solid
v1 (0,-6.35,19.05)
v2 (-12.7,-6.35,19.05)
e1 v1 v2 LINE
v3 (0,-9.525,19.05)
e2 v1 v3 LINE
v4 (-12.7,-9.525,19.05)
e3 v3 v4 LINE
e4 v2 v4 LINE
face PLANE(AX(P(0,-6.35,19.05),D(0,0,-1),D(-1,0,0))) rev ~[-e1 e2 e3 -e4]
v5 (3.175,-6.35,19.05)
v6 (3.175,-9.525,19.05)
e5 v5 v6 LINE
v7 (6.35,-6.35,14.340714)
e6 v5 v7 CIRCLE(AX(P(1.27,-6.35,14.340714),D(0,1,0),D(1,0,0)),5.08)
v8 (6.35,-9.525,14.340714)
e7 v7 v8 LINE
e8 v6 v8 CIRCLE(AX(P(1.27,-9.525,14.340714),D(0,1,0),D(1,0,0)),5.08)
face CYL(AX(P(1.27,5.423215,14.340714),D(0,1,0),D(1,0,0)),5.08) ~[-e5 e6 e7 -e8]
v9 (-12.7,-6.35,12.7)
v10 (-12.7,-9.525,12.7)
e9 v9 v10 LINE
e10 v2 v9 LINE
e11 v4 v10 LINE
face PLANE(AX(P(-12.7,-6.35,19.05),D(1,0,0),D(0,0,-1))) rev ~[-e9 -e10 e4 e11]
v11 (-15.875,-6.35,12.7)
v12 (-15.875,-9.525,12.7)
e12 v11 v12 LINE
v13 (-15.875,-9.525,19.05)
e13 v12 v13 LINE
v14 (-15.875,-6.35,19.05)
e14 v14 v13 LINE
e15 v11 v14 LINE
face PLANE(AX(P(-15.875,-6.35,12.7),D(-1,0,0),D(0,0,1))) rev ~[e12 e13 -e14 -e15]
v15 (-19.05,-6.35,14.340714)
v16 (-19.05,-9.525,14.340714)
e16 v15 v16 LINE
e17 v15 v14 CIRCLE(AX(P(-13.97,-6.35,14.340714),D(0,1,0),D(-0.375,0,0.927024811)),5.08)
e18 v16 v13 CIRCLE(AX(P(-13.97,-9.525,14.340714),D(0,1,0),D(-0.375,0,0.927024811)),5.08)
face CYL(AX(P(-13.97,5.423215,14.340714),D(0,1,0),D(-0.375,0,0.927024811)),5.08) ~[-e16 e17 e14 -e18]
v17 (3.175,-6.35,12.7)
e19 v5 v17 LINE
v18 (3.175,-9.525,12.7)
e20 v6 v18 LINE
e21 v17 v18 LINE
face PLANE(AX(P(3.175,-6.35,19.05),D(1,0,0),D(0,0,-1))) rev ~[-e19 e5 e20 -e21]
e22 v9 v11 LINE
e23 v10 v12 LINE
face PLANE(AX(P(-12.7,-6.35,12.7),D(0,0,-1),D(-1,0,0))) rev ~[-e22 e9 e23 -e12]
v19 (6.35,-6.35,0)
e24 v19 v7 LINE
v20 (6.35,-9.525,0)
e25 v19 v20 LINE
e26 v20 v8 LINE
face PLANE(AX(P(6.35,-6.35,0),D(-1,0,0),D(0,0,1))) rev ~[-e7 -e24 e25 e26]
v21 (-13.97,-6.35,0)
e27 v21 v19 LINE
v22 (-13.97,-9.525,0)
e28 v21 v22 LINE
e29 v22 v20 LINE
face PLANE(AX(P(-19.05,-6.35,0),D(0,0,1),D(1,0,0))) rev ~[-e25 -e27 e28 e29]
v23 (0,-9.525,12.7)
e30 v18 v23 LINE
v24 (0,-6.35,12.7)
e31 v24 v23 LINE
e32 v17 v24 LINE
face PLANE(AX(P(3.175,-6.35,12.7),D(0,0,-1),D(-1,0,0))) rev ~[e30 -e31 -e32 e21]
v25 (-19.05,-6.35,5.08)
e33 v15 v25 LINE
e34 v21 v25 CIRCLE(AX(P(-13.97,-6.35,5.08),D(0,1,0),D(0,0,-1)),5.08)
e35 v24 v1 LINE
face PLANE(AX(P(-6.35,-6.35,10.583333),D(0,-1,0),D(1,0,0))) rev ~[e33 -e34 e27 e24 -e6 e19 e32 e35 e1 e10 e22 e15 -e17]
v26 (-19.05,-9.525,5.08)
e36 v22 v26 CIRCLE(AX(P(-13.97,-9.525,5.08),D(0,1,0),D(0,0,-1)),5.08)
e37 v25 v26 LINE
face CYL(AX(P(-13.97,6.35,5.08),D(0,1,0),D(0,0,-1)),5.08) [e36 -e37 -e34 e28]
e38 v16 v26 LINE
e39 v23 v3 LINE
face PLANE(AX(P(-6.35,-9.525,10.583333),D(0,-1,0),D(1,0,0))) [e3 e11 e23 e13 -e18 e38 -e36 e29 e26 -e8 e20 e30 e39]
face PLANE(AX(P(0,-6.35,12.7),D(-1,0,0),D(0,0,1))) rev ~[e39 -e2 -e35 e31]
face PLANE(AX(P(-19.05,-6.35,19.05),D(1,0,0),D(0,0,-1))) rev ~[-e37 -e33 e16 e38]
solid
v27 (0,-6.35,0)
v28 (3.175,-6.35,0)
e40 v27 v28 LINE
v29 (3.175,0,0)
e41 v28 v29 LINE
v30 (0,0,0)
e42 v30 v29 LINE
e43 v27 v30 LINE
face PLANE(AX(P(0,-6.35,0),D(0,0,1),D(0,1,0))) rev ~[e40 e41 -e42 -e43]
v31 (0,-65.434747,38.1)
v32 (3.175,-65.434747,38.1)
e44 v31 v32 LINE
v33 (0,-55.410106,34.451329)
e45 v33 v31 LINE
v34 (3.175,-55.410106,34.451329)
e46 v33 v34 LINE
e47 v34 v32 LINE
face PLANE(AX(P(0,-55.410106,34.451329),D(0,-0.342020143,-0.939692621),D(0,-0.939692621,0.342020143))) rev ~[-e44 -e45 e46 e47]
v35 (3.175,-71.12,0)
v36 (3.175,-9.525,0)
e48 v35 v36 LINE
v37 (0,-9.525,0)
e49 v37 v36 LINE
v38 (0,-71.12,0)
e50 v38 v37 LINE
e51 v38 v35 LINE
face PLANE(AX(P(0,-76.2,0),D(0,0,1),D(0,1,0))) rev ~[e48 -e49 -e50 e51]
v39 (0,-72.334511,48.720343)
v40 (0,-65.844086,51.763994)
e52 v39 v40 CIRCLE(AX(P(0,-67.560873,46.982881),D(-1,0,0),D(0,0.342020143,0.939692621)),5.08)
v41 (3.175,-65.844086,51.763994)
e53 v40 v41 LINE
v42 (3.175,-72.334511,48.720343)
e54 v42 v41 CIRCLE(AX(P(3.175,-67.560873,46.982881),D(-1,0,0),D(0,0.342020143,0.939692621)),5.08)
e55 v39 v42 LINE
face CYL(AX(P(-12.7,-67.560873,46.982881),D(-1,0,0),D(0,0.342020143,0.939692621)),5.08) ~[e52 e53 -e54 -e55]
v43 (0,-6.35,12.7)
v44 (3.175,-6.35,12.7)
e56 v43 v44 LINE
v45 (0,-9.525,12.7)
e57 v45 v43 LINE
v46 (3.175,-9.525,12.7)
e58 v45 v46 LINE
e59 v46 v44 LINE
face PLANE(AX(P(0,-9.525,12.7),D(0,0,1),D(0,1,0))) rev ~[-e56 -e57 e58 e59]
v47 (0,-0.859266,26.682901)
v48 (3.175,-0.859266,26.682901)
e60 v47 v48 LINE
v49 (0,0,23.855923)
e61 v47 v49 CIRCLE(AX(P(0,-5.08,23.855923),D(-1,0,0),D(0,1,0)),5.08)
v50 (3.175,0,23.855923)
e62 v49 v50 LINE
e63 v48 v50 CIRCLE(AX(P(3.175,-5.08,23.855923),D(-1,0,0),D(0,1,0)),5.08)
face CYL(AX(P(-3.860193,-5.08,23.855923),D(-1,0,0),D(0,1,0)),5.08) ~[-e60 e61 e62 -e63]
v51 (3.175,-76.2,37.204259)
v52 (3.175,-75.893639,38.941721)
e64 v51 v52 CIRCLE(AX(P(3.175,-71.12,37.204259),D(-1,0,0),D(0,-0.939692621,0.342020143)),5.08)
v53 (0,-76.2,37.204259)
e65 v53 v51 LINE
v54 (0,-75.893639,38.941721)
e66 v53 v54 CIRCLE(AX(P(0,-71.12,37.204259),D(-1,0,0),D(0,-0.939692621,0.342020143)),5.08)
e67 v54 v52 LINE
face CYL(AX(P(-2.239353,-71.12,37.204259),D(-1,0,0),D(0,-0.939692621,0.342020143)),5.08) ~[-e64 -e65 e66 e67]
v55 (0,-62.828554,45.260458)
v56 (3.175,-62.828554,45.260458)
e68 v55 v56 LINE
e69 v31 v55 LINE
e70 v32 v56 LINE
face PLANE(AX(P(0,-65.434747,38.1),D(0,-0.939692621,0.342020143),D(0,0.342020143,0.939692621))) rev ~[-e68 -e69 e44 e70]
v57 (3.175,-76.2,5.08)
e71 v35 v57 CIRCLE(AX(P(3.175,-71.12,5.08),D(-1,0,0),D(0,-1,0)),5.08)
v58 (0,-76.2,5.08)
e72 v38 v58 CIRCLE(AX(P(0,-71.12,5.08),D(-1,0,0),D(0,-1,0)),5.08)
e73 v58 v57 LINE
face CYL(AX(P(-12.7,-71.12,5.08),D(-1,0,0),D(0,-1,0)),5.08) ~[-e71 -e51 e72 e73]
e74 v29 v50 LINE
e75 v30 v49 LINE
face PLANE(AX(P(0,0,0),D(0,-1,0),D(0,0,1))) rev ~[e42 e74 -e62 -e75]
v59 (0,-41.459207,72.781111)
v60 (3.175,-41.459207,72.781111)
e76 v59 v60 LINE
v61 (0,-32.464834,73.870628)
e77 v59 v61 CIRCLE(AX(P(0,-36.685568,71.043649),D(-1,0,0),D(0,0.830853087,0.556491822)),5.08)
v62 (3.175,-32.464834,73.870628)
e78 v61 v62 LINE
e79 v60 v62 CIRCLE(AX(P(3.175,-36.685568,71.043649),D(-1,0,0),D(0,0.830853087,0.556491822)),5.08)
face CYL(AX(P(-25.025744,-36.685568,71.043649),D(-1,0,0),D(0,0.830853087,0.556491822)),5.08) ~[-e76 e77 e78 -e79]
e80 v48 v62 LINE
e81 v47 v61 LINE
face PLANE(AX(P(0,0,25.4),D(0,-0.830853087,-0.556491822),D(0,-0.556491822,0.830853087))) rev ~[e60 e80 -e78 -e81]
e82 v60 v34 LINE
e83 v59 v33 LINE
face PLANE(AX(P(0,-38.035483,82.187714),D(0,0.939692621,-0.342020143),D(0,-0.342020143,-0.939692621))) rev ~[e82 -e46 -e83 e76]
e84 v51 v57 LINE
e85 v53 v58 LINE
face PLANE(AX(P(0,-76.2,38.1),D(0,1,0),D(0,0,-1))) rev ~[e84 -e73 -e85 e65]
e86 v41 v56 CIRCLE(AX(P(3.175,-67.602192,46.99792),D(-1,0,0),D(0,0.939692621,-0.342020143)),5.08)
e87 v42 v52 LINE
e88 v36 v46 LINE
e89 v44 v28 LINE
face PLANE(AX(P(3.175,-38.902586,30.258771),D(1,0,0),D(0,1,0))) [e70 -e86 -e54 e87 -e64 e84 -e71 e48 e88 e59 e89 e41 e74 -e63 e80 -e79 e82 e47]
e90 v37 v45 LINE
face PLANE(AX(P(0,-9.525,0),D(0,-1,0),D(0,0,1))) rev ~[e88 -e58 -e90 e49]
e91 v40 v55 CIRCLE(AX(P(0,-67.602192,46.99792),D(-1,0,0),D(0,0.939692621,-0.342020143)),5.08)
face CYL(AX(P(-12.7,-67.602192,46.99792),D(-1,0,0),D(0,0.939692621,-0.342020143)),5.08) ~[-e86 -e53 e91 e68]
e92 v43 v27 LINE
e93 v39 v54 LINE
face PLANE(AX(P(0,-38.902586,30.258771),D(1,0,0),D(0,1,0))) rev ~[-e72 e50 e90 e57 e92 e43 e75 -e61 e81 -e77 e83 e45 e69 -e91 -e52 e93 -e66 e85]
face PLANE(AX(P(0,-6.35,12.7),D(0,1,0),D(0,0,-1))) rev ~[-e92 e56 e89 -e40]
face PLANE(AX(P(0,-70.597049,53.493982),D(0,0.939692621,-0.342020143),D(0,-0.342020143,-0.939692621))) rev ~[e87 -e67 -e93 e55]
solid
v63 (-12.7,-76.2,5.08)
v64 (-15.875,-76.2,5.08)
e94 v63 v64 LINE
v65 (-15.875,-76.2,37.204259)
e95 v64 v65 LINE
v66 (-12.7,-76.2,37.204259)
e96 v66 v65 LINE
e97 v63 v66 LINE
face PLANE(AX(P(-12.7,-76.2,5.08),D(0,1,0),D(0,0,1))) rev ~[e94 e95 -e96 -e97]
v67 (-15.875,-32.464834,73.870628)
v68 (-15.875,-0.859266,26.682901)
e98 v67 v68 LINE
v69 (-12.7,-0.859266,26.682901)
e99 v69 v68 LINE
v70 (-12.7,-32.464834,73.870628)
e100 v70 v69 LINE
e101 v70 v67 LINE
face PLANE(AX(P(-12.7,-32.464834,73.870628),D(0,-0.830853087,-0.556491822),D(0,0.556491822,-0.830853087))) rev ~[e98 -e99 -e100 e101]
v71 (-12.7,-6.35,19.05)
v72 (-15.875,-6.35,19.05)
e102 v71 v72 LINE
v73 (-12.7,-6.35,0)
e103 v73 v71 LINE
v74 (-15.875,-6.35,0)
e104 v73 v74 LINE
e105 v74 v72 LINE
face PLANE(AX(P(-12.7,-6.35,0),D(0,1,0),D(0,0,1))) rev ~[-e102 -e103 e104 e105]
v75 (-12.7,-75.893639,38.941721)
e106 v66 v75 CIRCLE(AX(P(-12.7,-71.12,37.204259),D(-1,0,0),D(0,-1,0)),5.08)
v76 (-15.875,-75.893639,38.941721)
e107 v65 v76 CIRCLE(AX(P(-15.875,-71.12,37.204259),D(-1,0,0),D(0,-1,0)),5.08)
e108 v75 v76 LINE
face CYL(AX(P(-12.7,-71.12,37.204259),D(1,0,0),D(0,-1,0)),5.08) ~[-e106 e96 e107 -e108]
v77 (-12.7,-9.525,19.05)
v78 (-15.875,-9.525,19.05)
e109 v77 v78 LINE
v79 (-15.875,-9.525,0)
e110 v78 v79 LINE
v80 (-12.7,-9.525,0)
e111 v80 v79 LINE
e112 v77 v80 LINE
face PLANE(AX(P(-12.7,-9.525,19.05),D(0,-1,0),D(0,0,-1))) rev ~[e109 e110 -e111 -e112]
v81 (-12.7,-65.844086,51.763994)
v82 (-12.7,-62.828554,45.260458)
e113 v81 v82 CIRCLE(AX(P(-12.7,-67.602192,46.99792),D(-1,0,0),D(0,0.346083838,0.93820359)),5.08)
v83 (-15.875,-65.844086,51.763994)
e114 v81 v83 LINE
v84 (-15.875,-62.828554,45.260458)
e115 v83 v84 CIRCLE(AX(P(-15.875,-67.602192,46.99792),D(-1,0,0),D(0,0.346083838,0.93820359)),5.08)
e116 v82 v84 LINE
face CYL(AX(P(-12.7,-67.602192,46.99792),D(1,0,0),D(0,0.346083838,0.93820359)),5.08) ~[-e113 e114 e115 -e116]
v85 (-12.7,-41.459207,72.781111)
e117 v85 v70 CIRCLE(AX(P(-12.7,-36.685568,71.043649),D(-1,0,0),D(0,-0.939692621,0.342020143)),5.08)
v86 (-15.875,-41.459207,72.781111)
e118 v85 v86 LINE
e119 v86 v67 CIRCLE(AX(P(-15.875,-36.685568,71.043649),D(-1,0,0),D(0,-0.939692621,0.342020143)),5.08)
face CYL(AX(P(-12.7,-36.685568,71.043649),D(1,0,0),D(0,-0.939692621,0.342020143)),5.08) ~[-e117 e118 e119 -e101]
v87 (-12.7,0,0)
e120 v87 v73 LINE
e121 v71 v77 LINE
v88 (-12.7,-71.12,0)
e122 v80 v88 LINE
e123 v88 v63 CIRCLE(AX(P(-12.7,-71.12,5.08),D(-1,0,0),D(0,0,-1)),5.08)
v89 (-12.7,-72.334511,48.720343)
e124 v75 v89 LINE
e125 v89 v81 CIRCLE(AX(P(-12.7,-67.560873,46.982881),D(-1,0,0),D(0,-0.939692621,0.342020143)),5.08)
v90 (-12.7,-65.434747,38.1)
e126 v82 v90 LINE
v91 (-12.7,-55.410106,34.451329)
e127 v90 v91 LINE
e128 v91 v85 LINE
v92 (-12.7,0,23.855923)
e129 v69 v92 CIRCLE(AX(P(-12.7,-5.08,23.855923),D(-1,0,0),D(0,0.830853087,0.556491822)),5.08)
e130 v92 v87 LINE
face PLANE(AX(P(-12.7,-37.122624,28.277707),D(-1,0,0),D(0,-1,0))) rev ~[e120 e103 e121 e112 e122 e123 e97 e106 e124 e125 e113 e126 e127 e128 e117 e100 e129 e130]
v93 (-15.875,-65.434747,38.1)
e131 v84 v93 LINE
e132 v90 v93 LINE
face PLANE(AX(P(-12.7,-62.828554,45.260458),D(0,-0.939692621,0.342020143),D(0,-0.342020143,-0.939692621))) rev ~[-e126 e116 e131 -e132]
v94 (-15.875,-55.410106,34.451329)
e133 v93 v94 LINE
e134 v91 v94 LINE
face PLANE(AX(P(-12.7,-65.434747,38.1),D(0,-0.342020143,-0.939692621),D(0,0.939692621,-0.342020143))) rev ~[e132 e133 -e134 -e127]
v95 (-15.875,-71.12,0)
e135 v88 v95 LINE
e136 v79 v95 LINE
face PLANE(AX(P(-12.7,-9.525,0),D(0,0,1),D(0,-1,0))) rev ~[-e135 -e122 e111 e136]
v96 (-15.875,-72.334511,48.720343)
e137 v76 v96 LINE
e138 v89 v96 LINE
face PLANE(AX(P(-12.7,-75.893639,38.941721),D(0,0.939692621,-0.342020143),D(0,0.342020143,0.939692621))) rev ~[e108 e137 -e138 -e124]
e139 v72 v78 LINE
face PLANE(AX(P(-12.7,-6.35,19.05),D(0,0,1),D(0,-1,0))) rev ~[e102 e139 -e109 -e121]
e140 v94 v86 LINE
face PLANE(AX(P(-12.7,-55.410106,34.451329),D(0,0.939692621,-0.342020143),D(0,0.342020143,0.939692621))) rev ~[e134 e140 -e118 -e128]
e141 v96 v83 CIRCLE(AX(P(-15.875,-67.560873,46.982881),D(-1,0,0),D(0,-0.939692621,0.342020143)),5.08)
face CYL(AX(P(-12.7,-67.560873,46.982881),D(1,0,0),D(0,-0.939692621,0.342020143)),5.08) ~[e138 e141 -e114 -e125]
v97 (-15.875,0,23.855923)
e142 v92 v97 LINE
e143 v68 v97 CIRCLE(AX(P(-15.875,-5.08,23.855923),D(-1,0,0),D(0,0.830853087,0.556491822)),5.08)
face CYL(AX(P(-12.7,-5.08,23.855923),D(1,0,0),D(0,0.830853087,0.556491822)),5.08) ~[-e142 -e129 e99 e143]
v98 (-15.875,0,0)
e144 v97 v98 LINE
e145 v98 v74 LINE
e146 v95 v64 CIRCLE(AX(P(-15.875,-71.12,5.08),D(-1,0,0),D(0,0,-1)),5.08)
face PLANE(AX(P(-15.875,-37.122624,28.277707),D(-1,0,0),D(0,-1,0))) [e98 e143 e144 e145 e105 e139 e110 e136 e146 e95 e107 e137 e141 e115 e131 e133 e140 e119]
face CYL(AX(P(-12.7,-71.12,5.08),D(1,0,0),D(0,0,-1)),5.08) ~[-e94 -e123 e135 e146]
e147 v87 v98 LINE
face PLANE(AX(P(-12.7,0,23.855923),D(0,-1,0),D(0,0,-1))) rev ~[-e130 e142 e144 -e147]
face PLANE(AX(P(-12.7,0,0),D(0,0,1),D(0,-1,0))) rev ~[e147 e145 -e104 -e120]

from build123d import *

# Parameters (mm, degrees)
F1_DEPTH      = 3.175
F3_DEPTH      = 3.175
F4_T1_DEPTH   = 7.65370531
F4_T3_DEPTH   = 28.575
F4_T5_DEPTH   = 53.2264881201
F4_T7_DEPTH   = 10.8953858615
F4_2_T1_DEPTH = 26.7214301965
F4_2_T3_DEPTH = 28.575
F6_DEPTH      = 3.175


# Not quite as in the source:
# - a fillet or chamfer that OpenCascade refuses, or shapes differently, is made with other operations: its cross-section is extruded or revolved along the edge and cut away or added


with BuildPart() as f1:
    # F0 (on Right) → F1 (new body)
    with BuildSketch(Plane.YZ):
        Polygon((-6.35, 0), (0, 0), (0, 25.4), (-38.0354831527, 82.1877142469), (-55.4101064336, 34.451329111), (-65.4347473122, 38.1), (-61.0910914919, 50.034096284), (-70.597048836, 53.4939818054), (-76.2, 38.1), (-76.2, 0), (-9.525, 0), (-9.525, 12.7), (-6.35, 12.7), align=None)
    extrude(amount=F1_DEPTH)

    # F4: fillet of radius 5.08 on 6 edges, made by hand

    # F4_s2 → F4_t1 (cut)
    with BuildSketch(Plane.YZ.offset(-2.239352655)):
        with BuildLine():
            ThreePointArc((-75.8936385136, 38.9417212661), (-76.1228233853, 38.0863916805), (-76.2, 37.204258938))
            Line((-76.2, 37.204258938), (-76.2, 38.1))
            Line((-76.2, 38.1), (-75.8936385136, 38.9417212661))
        make_face()
    extrude(amount=F4_T1_DEPTH, mode=Mode.SUBTRACT)

    # F4_s4 → F4_t3 (cut)
    with BuildSketch(Plane.YZ.offset(-12.7)):
        with BuildLine():
            ThreePointArc((-65.8234103224, 51.7565194773), (-69.7077734201, 51.5869245219), (-72.3345111641, 48.7203432918))
            Line((-72.3345111641, 48.7203432918), (-70.597048836, 53.4939818054))
            Line((-70.597048836, 53.4939818054), (-65.8234103224, 51.7565194773))
        make_face()
        with BuildLine():
            ThreePointArc((-62.82855382, 45.2604577704), (-62.9981487755, 49.1448208681), (-65.8647300055, 51.7715586121))
            Line((-65.8647300055, 51.7715586121), (-61.0910914919, 50.034096284))
            Line((-61.0910914919, 50.034096284), (-62.82855382, 45.2604577704))
        make_face()
        with BuildLine():
            ThreePointArc((-76.2, 5.08), (-74.7121024484, 1.4878975516), (-71.12, 0))
            Line((-71.12, 0), (-76.2, 0))
            Line((-76.2, 0), (-76.2, 5.08))
        make_face()
    extrude(amount=F4_T3_DEPTH, mode=Mode.SUBTRACT)

    # F4_s6 → F4_t5 (cut)
    with BuildSketch(Plane.YZ.offset(-25.0257440601)):
        with BuildLine():
            ThreePointArc((-32.4648343865, 73.8706275668), (-37.2964586363, 76.0867843163), (-41.4592065808, 72.7811114378))
            Line((-41.4592065808, 72.7811114378), (-38.0354831527, 82.1877142469))
            Line((-38.0354831527, 82.1877142469), (-32.4648343865, 73.8706275668))
        make_face()
    extrude(amount=F4_T5_DEPTH, mode=Mode.SUBTRACT)

    # F4_s8 → F4_t7 (cut)
    with BuildSketch(Plane.YZ.offset(-3.8601929308)):
        with BuildLine():
            ThreePointArc((0, 23.8559228277), (-0.2195613831, 25.3332638347), (-0.8592663193, 26.6829012848))
            Line((-0.8592663193, 26.6829012848), (0, 25.4))
            Line((0, 25.4), (0, 23.8559228277))
        make_face()
    extrude(amount=F4_T7_DEPTH, mode=Mode.SUBTRACT)


with BuildPart() as f3:
    # F2 (on face) → F3 (new body)
    with BuildSketch(Plane.XZ.offset(6.35)):
        Polygon((3.175, 19.05), (3.175, 12.7), (0, 12.7), (0, 19.05), (-12.7, 19.05), (-12.7, 12.7), (-15.875, 12.7), (-15.875, 19.05), (-19.05, 19.05), (-19.05, 0), (6.35, 0), (6.35, 19.05), align=None)
    extrude(amount=F3_DEPTH)

    # F4#2: fillet of radius 5.08 on 3 edges, made by hand

    # F4_2_s2 → F4_2_t1 (cut)
    with BuildSketch(Plane.XZ.offset(-5.4232150983)):
        with BuildLine():
            ThreePointArc((6.35, 14.3407139607), (5.4821134838, 17.1805202921), (3.175, 19.05))
            Line((3.175, 19.05), (6.35, 19.05))
            Line((6.35, 19.05), (6.35, 14.3407139607))
        make_face()
        with BuildLine():
            ThreePointArc((-15.875, 19.05), (-18.1821134838, 17.1805202921), (-19.05, 14.3407139607))
            Line((-19.05, 14.3407139607), (-19.05, 19.05))
            Line((-19.05, 19.05), (-15.875, 19.05))
        make_face()
    extrude(amount=F4_2_T1_DEPTH, mode=Mode.SUBTRACT)

    # F4_2_s4 → F4_2_t3 (cut)
    with BuildSketch(Plane.XZ.offset(-6.35)):
        with BuildLine():
            ThreePointArc((-13.97, 0), (-17.5621024484, 1.4878975516), (-19.05, 5.08))
            Line((-19.05, 5.08), (-19.05, 0))
            Line((-19.05, 0), (-13.97, 0))
        make_face()
    extrude(amount=F4_2_T3_DEPTH, mode=Mode.SUBTRACT)


with BuildPart() as f6:
    # F5 (on face) → F6 (new body)
    with BuildSketch(Plane(origin=(-12.7, 0, 0), x_dir=(0, -1, 0), z_dir=(-1, 0, 0))):
        with BuildLine():
            Line((75.8936385136, 38.9417212661), (72.3345111641, 48.7203432918))
            ThreePointArc((72.3345111641, 48.7203432918), (69.7177313424, 51.5822679428), (65.844086436, 51.7639943376))
            ThreePointArc((65.844086436, 51.7639943376), (62.9935137558, 49.1348528926), (62.82855382, 45.2604577704))
            Line((62.82855382, 45.2604577704), (65.4347473122, 38.1))
            Line((65.4347473122, 38.1), (55.4101064336, 34.451329111))
            Line((55.4101064336, 34.451329111), (41.4592065808, 72.7811114378))
            ThreePointArc((41.4592065808, 72.7811114378), (37.2964586363, 76.0867843163), (32.4648343865, 73.8706275668))
            Line((32.4648343865, 73.8706275668), (0.8592663193, 26.6829012848))
            ThreePointArc((0.8592663193, 26.6829012848), (0.2195613831, 25.3332638347), (0, 23.8559228277))
            Line((0, 23.8559228277), (0, 0))
            Line((0, 0), (6.35, 0))
            Line((6.35, 0), (6.35, 12.7))
            Line((6.35, 12.7), (6.35, 19.05))
            Line((6.35, 19.05), (9.525, 19.05))
            Line((9.525, 19.05), (9.525, 12.7))
            Line((9.525, 12.7), (9.525, 0))
            Line((9.525, 0), (71.12, 0))
            ThreePointArc((71.12, 0), (74.7121024484, 1.4878975516), (76.2, 5.08))
            Line((76.2, 5.08), (76.2, 37.204258938))
            ThreePointArc((76.2, 37.204258938), (76.1228233853, 38.0863916805), (75.8936385136, 38.9417212661))
        make_face()
    extrude(amount=F6_DEPTH)


solid = Compound([f1.part, f3.part, f6.part])
